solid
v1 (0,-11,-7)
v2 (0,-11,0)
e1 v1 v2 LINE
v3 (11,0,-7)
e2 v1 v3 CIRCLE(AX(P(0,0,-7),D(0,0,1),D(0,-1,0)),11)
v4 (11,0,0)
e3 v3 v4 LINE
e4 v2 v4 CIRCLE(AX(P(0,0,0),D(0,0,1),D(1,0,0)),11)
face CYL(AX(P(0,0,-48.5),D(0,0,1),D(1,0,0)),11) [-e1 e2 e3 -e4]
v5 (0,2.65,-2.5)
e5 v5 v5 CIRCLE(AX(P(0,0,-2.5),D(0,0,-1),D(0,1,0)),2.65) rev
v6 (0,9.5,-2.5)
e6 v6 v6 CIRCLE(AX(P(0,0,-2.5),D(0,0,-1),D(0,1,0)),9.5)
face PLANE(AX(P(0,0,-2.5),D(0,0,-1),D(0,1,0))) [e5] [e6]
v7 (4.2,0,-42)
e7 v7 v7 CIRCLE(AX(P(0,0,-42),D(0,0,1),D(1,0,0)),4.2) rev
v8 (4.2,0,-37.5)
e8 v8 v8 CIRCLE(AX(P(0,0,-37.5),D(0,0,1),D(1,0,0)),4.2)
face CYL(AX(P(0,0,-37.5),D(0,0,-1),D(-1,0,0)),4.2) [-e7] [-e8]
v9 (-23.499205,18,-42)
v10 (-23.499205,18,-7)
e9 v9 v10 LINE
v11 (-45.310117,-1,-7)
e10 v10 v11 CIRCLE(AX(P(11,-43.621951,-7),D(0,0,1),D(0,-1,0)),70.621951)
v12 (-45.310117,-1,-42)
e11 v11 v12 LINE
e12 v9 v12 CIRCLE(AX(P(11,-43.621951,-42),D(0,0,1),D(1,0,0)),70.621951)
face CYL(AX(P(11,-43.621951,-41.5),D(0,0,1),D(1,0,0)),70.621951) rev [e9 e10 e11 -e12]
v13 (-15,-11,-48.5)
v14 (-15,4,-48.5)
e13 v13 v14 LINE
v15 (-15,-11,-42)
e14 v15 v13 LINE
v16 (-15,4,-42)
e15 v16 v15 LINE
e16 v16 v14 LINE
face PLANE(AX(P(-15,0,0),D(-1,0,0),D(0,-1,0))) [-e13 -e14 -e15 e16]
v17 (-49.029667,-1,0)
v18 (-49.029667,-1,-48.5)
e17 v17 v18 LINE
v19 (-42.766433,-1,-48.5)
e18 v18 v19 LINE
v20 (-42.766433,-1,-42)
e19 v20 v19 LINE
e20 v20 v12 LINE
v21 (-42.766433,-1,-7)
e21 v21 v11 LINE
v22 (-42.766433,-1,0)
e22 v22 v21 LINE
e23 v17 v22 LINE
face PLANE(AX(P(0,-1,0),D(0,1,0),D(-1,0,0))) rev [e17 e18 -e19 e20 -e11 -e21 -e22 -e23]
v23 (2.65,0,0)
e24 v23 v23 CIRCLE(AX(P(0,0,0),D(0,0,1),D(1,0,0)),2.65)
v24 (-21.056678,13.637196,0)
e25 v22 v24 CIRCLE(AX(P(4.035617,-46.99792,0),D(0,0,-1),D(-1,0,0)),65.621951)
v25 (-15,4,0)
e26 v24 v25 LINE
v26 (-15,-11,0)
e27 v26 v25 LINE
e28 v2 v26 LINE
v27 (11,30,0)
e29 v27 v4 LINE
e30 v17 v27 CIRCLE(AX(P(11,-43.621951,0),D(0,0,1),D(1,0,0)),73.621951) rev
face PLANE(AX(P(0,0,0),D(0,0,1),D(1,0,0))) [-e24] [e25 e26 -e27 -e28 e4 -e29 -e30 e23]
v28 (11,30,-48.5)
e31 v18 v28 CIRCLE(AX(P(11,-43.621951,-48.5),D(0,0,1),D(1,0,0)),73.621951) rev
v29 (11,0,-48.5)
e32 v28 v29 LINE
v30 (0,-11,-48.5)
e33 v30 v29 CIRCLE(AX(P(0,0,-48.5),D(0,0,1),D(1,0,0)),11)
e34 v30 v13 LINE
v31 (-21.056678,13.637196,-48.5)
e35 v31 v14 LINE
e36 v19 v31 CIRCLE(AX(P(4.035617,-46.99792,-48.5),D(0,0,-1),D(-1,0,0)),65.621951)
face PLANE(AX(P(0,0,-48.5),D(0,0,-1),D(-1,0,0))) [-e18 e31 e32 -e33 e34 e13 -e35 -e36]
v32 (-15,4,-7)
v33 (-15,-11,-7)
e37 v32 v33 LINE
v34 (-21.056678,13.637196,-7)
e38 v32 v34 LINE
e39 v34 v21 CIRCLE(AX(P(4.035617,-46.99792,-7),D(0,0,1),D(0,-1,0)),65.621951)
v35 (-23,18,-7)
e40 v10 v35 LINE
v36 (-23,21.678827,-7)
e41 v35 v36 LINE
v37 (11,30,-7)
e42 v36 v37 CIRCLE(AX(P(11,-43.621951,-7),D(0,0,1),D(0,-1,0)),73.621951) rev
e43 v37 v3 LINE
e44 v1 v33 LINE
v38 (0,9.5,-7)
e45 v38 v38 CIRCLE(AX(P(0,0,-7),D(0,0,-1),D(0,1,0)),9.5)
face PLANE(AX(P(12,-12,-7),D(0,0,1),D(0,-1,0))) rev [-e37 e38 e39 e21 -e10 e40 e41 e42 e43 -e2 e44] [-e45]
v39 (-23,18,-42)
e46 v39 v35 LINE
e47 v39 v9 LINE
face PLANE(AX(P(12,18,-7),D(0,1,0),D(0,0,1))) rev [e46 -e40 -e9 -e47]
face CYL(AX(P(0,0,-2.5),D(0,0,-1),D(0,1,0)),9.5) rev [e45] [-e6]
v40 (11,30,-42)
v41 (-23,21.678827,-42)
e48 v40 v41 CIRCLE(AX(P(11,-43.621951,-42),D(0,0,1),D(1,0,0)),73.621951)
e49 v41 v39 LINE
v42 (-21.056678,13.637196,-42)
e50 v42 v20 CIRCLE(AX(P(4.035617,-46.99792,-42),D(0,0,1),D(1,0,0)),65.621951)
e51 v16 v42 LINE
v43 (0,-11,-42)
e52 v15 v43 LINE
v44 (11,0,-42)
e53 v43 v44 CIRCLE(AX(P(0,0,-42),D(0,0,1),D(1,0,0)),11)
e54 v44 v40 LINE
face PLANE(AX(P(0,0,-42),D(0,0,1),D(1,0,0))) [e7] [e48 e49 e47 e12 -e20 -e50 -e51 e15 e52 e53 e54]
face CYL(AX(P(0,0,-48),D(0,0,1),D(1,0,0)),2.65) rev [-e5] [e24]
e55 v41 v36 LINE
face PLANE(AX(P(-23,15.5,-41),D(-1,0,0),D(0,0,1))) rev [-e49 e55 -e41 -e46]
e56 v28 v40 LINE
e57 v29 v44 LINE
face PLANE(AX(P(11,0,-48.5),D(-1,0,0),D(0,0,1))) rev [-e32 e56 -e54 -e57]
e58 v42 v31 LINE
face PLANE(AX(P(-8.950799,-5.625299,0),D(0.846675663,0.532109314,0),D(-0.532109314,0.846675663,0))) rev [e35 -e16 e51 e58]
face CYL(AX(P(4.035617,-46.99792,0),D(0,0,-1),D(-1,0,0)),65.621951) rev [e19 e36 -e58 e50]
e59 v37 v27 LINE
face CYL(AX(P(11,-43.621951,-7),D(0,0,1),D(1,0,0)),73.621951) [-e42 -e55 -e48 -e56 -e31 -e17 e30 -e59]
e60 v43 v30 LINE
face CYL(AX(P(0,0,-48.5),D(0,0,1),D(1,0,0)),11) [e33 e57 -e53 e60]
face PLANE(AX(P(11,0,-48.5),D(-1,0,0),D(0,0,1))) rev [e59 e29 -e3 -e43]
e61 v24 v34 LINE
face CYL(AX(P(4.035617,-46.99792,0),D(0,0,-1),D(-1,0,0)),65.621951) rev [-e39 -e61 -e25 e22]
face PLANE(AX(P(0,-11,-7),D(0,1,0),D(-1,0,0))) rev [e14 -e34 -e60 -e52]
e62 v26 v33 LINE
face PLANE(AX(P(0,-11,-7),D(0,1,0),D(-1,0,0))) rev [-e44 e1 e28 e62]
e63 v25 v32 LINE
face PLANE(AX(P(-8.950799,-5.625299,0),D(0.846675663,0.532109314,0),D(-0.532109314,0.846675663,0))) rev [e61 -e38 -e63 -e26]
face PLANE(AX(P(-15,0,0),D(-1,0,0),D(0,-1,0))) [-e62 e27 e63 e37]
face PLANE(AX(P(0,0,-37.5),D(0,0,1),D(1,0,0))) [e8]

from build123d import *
from build123d.topology import SkipClean

# Parameters (mm, degrees)
SKETCH1_R                = 9.5
BOSS_EXTRUDE1_DEPTH      = 48
SKETCH2_W                = 34
SKETCH2_H                = 30
CUT_EXTRUDE1_DEPTH       = 62.481704596
BOSS_EXTRUDE2_START      = -2.5
SKETCH3_R                = 9.5
SKETCH3_R_2              = 2.4
BOSS_EXTRUDE2_DEPTH      = 2.5
SKETCH4_R                = 9.5
SKETCH4_R_2              = 4.2
BOSS_EXTRUDE3_DEPTH      = 7
SKETCH5_R                = 4.2
BOSS_EXTRUDE4_DEPTH      = 11
BOSS_EXTRUDE5_DEPTH      = 48
CUT_EXTRUDE2_START       = -48
CUT_EXTRUDE2_OUTLINE_R   = 2.65
CUT_EXTRUDE2_DEPTH       = 48
CUT_EXTRUDE3_START       = -4.5
SKETCH8_R                = 9.5
CUT_EXTRUDE3_DEPTH       = 4.5
SKETCH9_R                = 6.067807638
CUT_EXTRUDE4_DEPTH       = 4.5
SKETCH10_R               = 9.5
BOSS_EXTRUDE6_DEPTH      = 4.5
SKETCH11_R               = 4.2
BOSS_EXTRUDE7_DEPTH      = 3.5
SKETCH12_R               = 2.4
BOSS_EXTRUDE8_DEPTH      = 2.5
SKETCH13_W               = 35
SKETCH13_H               = 34
CUT_EXTRUDE5_DEPTH       = 14.5
SKETCH15_R               = 3.436413098
BOSS_EXTRUDE9_DEPTH      = 10
BOSS_EXTRUDE10_DEPTH     = 0.5
SKETCH18_R               = 4.2
CUT_EXTRUDE8_DEPTH       = 0.5
CUT_EXTRUDE9_DEPTH       = 69.529190861
BOSS_EXTRUDE11_DEPTH     = 7
CUT_EXTRUDE10_DEPTH      = 80.22909819
BOSS_EXTRUDE12_DEPTH     = 41.5
SKETCH25_R               = 4.2
CUT_EXTRUDE11_DEPTH      = 0.5
CUT_EXTRUDE12_DEPTH      = 80.22909819
CUT_EXTRUDE12_DEPTH_BACK = 80.22909819


# Read off the part's stored shape, not the designer's step: Cut-Extrude2
with BuildPart() as part:
    # Sketch1 → Boss-Extrude1 (new body)
    with BuildSketch(Plane.XY):
        with BuildLine():
            Line((-12, 0), (-12, 30))
            Line((-12, 30), (12, 30))
            Line((12, 30), (12, 0))
            ThreePointArc((12, 0), (0, -12), (-12, 0))
        make_face()
        Circle(SKETCH1_R, mode=Mode.SUBTRACT)
    extrude(amount=-BOSS_EXTRUDE1_DEPTH)

    # Sketch2 → Cut-Extrude1 (cut, through all)
    with BuildSketch(Plane.ZY.offset(12)):
        with Locations((-24, 3)):
            Rectangle(SKETCH2_W, SKETCH2_H)
    extrude(amount=-CUT_EXTRUDE1_DEPTH, mode=Mode.SUBTRACT)

    # Sketch3 → Boss-Extrude2 (add)
    with BuildSketch(Plane(origin=(0, 0, -48), x_dir=(-1, 0, 0), z_dir=(0, 0, -1)).offset(BOSS_EXTRUDE2_START)):
        Circle(SKETCH3_R)
        Circle(SKETCH3_R_2, mode=Mode.SUBTRACT)
    extrude(amount=BOSS_EXTRUDE2_DEPTH)

    # Sketch4 → Boss-Extrude3 (add)
    with BuildSketch(Plane.XY):
        with Locations(Location((0, 0, 0), (0, 0, 180))):
            Circle(SKETCH4_R)
        Circle(SKETCH4_R_2, mode=Mode.SUBTRACT)
    extrude(amount=-BOSS_EXTRUDE3_DEPTH)

    # Sketch5 → Boss-Extrude4 (add)
    with BuildSketch(Plane.XY):
        Circle(SKETCH5_R)
    extrude(amount=-BOSS_EXTRUDE4_DEPTH)

    # Sketch6 → Boss-Extrude5 (add)
    with BuildSketch(Plane(origin=(0, 0, -48), x_dir=(-1, 0, 0), z_dir=(0, 0, -1))):
        Polygon((12, 30), (12, 18), (18, 18), (38, 18), (38, 30), align=None)
    extrude(amount=-BOSS_EXTRUDE5_DEPTH)

    # Cut-Extrude2 outline → Cut-Extrude2 (cut)
    with BuildSketch(Plane.XY.offset(CUT_EXTRUDE2_START)):
        Circle(CUT_EXTRUDE2_OUTLINE_R)
    extrude(amount=CUT_EXTRUDE2_DEPTH, mode=Mode.SUBTRACT)

    # Sketch8 → Cut-Extrude3 (cut)
    with BuildSketch(Plane(origin=(0, 0, -7), x_dir=(-1, 0, 0), z_dir=(0, 0, -1)).offset(CUT_EXTRUDE3_START)):
        Circle(SKETCH8_R)
    extrude(amount=CUT_EXTRUDE3_DEPTH, mode=Mode.SUBTRACT)


with BuildPart() as cut_extrude3_piece_1:
    # of the separate pieces the step leaves, piece 1, a body of its own (cut_extrude3_pieces)
    add(part.part.solids().sort_by_distance((-12, 0, 0))[0])

    # Sketch10 → Boss-Extrude6 (add)
    with BuildSketch(Plane.XY.offset(-45.5)):
        with Locations(Location((0, 0, 0), (0, 0, 90))):
            Circle(SKETCH10_R)
    extrude(amount=BOSS_EXTRUDE6_DEPTH)

    # Sketch11 → Boss-Extrude7 (add)
    with BuildSketch(Plane.XY.offset(-41)):
        with Locations(Location((0, 0, 0), (0, 0, 180))):
            Circle(SKETCH11_R)
    extrude(amount=BOSS_EXTRUDE7_DEPTH)

    # Sketch12 → Boss-Extrude8 (add)
    with BuildSketch(Plane(origin=(0, 0, -48), x_dir=(-1, 0, 0), z_dir=(0, 0, -1))):
        Circle(SKETCH12_R)
    extrude(amount=-BOSS_EXTRUDE8_DEPTH)

    # Sketch13 → Cut-Extrude5 (cut)
    with BuildSketch(Plane(origin=(0, 30, 0), x_dir=(1, 0, 0), z_dir=(0, 1, 0))):
        with Locations((-5.5, 24)):
            Rectangle(SKETCH13_W, SKETCH13_H)
    extrude(amount=-CUT_EXTRUDE5_DEPTH, mode=Mode.SUBTRACT)

    # Sketch15 → Boss-Extrude9 (add)
    with BuildSketch(Plane(origin=(0, 0, -48), x_dir=(-1, 0, 0), z_dir=(0, 0, -1))):
        Circle(SKETCH15_R)
    extrude(amount=-BOSS_EXTRUDE9_DEPTH)

    # Sketch16 → Boss-Extrude10 (add)
    with SkipClean():  # the faces are left unmerged after this step: merging them gives an invalid solid
        with BuildSketch(Plane(origin=(0, 0, -48), x_dir=(-1, 0, 0), z_dir=(0, 0, -1))):
            Polygon((38, 30), (-12, 30), (-12, 18), (12, 18), (38, 18), align=None)
            with BuildLine():
                Line((-12, 0), (12, 0))
                ThreePointArc((12, 0), (0, -12), (-12, 0))
            make_face()
            with BuildLine():
                ThreePointArc((12, 0), (0, 12), (-12, 0))
                Line((-12, 0), (12, 0))
            make_face()
            with BuildLine():
                Line((12, 0), (-12, 0))
                ThreePointArc((-12, 0), (0, -12), (12, 0))
            make_face()
            with BuildLine():
                Line((12, 18), (-12, 18))
                Line((-12, 18), (-12, 0))
                ThreePointArc((-12, 0), (0, 12), (12, 0))
                Line((12, 0), (12, 18))
            make_face()
        extrude(amount=BOSS_EXTRUDE10_DEPTH)

    # Sketch18 → Cut-Extrude8 (cut)
    with SkipClean():  # the faces are left unmerged after this step: merging them gives an invalid solid
        with BuildSketch(Plane.XY.offset(-41)):
            with BuildLine():
                Line((12, 30), (-23, 30))
                Line((-23, 30), (-23, 18))
                Line((-23, 18), (-12, 18))
                Line((-12, 18), (-12, 0))
                ThreePointArc((-12, 0), (0, -12), (12, 0))
                Line((12, 0), (12, 30))
            make_face()
            Circle(SKETCH18_R, mode=Mode.SUBTRACT)
        extrude(amount=-CUT_EXTRUDE8_DEPTH, mode=Mode.SUBTRACT)

    # Sketch19 → Cut-Extrude9 (cut, through all)
    with SkipClean():  # the faces are left unmerged after this step: merging them gives an invalid solid
        with BuildSketch(Plane.XY):
            with BuildLine():
                ThreePointArc((11, 0), (0, -11), (-11, 0))
                Line((-11, 0), (-12, 0))
                ThreePointArc((-12, 0), (0, -12), (12, 0))
                Line((12, 0), (12, 30))
                Line((12, 30), (11, 30))
                Line((11, 30), (11, 0))
            make_face()
        extrude(amount=-CUT_EXTRUDE9_DEPTH, mode=Mode.SUBTRACT)

    # Sketch21 → Boss-Extrude11 (add)
    with SkipClean():  # the faces are left unmerged after this step: merging them gives an invalid solid
        with BuildSketch(Plane.XY):
            with BuildLine():
                Line((-55, -11), (0, -11))
                ThreePointArc((0, -11), (-7.778174593, -7.778174593), (-11, 0))
                Line((-11, 0), (-12, 0))
                Line((-12, 0), (-12, 18))
                Line((-12, 18), (-29.285566016, 18))
                ThreePointArc((-29.285566016, 18), (-44.085437149, 5.222560402), (-55, -11))
            make_face()
        boss_extrude11 = extrude(amount=-BOSS_EXTRUDE11_DEPTH)

    # Mirror2: Boss-Extrude11 across plane
    with SkipClean():  # the faces are left unmerged after this step: merging them gives an invalid solid
        add(boss_extrude11.mirror(Plane.XY.offset(-24.25)))

    # Sketch23 → Cut-Extrude10 (cut, through all)
    with SkipClean():  # the faces are left unmerged after this step: merging them gives an invalid solid
        with BuildSketch(Plane.XY):
            with BuildLine():
                Line((11, 30), (-38, 30))
                Line((-38, 30), (-38, 11.325220695))
                ThreePointArc((-38, 11.325220695), (-15.219016868, 25.173069355), (11, 30))
            make_face()
        extrude(amount=-CUT_EXTRUDE10_DEPTH, mode=Mode.SUBTRACT)

    # Sketch24 → Boss-Extrude12 (add)
    with SkipClean():  # the faces are left unmerged after this step: merging them gives an invalid solid
        with BuildSketch(Plane.XY):
            with BuildLine():
                ThreePointArc((-23, 21.6788275), (-41.60205739, 7.887419381), (-55, -11))
                Line((-55, -11), (-51.635998377, -11))
                ThreePointArc((-51.635998377, -11), (-39.486754135, 5.75970176), (-23, 18.276837089))
                Line((-23, 18.276837089), (-23, 21.6788275))
            make_face()
        extrude(amount=-BOSS_EXTRUDE12_DEPTH)

    # Sketch25 → Cut-Extrude11 (cut)
    # profile 1 of 3: a face of its own
    with BuildSketch(Plane.XY.offset(-41.5)):
        with BuildLine():
            ThreePointArc((11, 27), (-6.550595226, 24.784456384), (-23, 18.276837089))
            Line((-23, 18.276837089), (-23, 18))
            Line((-23, 18), (-23.499204657, 18))
            ThreePointArc((-23.499204657, 18), (-39.685914386, 5.555259732), (-51.635998377, -11))
            Line((-51.635998377, -11), (0, -11))
            ThreePointArc((0, -11), (-7.778174593, 7.778174593), (11, 0))
            Line((11, 0), (11, 27))
        make_face()
    # profile 2 of 3: a face of its own
    with BuildSketch(Plane.XY.offset(-41.5)):
        with BuildLine():
            ThreePointArc((0, -11), (7.778174593, -7.778174593), (11, 0))
            ThreePointArc((11, 0), (-7.778174593, 7.778174593), (0, -11))
        make_face()
        Circle(SKETCH25_R, mode=Mode.SUBTRACT)
    # profile 3 of 3: a face of its own
    with BuildSketch(Plane.XY.offset(-41.5)):
        with BuildLine():
            ThreePointArc((11, 30), (-6.501727856, 27.889455027), (-23, 21.6788275))
            Line((-23, 21.6788275), (-23, 18.276837089))
            ThreePointArc((-23, 18.276837089), (-6.550595226, 24.784456384), (11, 27))
            Line((11, 27), (11, 30))
        make_face()
    extrude(amount=-CUT_EXTRUDE11_DEPTH, mode=Mode.SUBTRACT)

    # Sketch26 → Cut-Extrude12 (cut, two sides: drawn at the far end of the back side and taken through both)
    with BuildSketch(Plane(origin=(0, 0, -48.5), x_dir=(-1, 0, 0), z_dir=(0, 0, -1)).offset(-CUT_EXTRUDE12_DEPTH_BACK)):
        with BuildLine():
            Line((15, -11), (15, 4))
            Line((15, 4), (21.056677648, 13.637195648))
            ThreePointArc((21.056677648, 13.637195648), (32.64899906, 7.412367977), (42.766432542, -1))
            Line((42.766432542, -1), (55, -1))
            Line((55, -1), (55, -11))
            Line((55, -11), (15, -11))
        make_face()
    extrude(amount=CUT_EXTRUDE12_DEPTH + CUT_EXTRUDE12_DEPTH_BACK, mode=Mode.SUBTRACT)


with BuildPart() as cut_extrude3_piece_2:
    # of the separate pieces the step leaves, piece 2, a body of its own (cut_extrude3_pieces)
    add(part.part.solids().sort_by_distance((4.2, 0, -7))[0])

    # Sketch9 → Cut-Extrude4 (cut)
    with BuildSketch(Plane(origin=(0, 0, -11), x_dir=(-1, 0, 0), z_dir=(0, 0, -1))):
        Circle(SKETCH9_R)
    extrude(amount=-CUT_EXTRUDE4_DEPTH, mode=Mode.SUBTRACT)


solid = cut_extrude3_piece_1.part
